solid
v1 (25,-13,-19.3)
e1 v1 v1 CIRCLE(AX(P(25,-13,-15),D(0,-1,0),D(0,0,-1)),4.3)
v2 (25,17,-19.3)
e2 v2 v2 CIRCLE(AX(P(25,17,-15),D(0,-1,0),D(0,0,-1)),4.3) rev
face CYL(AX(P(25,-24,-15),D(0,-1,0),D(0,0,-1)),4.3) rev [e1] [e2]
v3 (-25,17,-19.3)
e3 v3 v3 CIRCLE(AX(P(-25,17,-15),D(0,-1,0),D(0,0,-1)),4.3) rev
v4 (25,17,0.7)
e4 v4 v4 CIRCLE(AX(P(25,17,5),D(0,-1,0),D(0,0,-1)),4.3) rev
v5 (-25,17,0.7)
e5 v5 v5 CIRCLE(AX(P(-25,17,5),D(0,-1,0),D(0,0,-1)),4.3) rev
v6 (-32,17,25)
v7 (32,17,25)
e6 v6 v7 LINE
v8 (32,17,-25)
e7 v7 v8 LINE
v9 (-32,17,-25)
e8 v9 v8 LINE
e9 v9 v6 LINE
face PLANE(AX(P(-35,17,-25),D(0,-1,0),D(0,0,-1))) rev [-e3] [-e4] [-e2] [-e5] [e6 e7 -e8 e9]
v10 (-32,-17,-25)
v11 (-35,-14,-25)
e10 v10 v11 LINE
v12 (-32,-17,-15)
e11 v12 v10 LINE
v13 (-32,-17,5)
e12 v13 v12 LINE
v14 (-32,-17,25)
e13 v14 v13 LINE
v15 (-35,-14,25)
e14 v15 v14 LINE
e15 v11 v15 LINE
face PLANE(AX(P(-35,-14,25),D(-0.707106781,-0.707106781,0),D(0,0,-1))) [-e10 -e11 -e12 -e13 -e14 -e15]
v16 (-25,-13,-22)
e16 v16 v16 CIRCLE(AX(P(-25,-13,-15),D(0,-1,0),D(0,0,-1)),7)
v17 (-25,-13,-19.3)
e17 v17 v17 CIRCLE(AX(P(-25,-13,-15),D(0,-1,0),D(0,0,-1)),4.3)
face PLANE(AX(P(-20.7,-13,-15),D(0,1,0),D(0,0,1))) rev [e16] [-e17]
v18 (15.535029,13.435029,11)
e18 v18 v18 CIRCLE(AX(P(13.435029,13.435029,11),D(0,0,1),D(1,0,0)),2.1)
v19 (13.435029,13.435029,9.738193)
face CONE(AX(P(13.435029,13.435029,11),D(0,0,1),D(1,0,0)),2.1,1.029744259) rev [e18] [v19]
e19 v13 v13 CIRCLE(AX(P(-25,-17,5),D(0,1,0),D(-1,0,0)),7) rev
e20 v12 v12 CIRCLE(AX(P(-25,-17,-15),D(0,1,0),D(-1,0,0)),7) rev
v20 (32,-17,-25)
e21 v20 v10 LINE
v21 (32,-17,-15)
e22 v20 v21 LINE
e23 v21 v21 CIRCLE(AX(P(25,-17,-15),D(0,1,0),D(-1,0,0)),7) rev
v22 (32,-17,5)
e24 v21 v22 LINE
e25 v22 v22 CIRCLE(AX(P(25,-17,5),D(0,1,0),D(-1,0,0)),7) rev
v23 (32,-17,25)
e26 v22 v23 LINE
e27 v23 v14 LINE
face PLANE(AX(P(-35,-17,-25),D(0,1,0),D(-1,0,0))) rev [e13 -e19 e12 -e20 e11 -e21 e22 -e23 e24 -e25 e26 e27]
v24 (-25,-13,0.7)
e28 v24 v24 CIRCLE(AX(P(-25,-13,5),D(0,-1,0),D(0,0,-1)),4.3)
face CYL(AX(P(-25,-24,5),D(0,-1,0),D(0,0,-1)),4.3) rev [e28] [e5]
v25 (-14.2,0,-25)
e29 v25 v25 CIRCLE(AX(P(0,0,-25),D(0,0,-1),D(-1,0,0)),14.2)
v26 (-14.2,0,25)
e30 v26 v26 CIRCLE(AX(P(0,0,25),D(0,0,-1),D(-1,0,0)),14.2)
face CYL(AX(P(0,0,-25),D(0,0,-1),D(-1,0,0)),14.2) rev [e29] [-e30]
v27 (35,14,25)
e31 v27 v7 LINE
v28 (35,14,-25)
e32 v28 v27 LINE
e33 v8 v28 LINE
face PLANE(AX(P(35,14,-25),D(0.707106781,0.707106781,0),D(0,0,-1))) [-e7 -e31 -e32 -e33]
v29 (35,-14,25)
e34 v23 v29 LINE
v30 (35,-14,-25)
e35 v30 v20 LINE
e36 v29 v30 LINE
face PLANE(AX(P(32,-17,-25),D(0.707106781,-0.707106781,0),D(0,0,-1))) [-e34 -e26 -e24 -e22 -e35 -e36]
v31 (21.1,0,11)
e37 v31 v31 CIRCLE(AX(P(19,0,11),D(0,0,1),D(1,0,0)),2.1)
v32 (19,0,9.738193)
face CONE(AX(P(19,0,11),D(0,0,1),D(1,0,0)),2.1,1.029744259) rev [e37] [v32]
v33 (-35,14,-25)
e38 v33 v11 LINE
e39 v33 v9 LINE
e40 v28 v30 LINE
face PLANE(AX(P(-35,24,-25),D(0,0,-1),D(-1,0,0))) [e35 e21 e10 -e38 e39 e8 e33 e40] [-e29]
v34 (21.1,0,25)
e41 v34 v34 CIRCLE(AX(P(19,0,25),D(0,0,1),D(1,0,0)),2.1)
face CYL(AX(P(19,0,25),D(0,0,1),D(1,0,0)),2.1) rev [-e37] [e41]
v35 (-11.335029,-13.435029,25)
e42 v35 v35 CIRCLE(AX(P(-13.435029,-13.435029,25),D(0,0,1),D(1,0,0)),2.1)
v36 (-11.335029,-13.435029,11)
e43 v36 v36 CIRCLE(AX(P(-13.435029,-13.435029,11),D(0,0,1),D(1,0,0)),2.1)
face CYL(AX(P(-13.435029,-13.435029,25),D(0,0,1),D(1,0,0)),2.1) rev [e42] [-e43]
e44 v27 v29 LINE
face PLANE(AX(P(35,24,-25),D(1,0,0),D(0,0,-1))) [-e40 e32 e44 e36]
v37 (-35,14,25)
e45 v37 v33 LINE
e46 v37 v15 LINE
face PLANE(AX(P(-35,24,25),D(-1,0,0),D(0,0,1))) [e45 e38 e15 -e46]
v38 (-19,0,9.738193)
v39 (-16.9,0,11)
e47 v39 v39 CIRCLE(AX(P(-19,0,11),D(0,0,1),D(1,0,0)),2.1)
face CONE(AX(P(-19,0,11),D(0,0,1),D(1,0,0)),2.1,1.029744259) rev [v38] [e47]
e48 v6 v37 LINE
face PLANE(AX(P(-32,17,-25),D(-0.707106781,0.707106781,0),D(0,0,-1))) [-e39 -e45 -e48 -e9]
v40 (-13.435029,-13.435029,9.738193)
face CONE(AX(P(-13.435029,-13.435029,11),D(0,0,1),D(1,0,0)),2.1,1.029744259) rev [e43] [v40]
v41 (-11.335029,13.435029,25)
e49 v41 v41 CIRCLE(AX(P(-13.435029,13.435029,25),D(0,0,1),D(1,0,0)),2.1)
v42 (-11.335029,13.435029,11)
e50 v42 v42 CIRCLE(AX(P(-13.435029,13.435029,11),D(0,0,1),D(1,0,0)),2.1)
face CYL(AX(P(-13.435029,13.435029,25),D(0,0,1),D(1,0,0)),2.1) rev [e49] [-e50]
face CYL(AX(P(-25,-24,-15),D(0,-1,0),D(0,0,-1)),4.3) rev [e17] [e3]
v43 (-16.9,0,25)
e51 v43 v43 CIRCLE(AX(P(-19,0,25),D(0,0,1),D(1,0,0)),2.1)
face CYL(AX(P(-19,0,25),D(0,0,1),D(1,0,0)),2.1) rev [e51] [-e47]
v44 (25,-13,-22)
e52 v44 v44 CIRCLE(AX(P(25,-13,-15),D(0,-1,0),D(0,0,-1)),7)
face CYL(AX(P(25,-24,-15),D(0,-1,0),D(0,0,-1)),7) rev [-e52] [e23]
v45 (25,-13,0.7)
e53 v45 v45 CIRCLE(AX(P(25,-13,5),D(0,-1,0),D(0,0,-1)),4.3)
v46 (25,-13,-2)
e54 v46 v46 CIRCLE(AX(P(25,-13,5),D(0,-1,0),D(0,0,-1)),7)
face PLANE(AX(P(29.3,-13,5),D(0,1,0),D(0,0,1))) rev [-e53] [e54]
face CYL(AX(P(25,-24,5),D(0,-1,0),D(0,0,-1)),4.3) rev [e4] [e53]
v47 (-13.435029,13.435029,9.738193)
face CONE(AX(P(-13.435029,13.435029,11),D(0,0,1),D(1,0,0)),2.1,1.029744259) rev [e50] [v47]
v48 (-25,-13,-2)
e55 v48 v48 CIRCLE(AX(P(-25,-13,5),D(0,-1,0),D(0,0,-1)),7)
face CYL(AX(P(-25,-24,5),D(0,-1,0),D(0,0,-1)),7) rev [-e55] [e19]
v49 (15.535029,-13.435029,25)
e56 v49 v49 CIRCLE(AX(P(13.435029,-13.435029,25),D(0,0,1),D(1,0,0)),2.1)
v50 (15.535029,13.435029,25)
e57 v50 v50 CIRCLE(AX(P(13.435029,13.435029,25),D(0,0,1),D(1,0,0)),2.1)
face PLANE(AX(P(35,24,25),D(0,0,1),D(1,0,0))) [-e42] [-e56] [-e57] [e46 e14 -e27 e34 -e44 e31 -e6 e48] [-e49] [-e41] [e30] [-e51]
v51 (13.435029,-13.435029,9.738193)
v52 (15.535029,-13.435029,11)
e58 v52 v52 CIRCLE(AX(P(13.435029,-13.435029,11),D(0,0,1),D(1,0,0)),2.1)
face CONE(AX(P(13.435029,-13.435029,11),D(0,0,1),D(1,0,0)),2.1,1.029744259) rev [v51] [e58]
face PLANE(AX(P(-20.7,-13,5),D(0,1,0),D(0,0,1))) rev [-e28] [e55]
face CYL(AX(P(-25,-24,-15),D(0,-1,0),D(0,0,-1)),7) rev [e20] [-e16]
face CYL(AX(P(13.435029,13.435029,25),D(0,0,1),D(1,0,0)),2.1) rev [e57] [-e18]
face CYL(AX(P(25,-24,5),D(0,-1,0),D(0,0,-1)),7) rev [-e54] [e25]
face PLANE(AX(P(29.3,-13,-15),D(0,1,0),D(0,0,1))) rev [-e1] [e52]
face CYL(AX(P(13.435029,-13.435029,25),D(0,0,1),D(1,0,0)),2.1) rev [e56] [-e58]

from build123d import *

# Parameters (mm, degrees)
SKETCH1_W                               = 70
SKETCH1_H                               = 50
BOSS_EXTRUDE1_DEPTH                     = 48
CBORE_FOR_M8_HEX_HEAD_BOLT1_D           = 8.6
CBORE_FOR_M8_HEX_HEAD_BOLT1_CBORE_D     = 14
CBORE_FOR_M8_HEX_HEAD_BOLT1_CBORE_DEPTH = 11
M25_CLEARANCE_HOLE1_D                   = 28.4
F_4_2_4_2_DIAMETER_HOLE1_D              = 4.2
F_4_2_4_2_DIAMETER_HOLE1_DEPTH          = 14
F_4_2_4_2_DIAMETER_HOLE1_TIP            = 1.2618073
SKETCH8_W                               = 70
SKETCH8_H                               = 7
CUT_EXTRUDE1_DEPTH                      = 66.582009728
CHAMFER1_SIZE                           = 3


with BuildPart() as part:
    # Sketch1 → Boss-Extrude1 (new body)
    with BuildSketch(Plane.XZ.offset(24)):
        Rectangle(SKETCH1_W, SKETCH1_H)
    extrude(amount=-BOSS_EXTRUDE1_DEPTH)

    # CBORE for M8 Hex Head Bolt1 (through all)
    with Locations(Plane(origin=(0, -24, 0), x_dir=(-1, 0, 0), z_dir=(0, -1, 0))):
        with Locations((25, -5), (-25, -5), (-25, 15), (25, 15)):
            CounterBoreHole(CBORE_FOR_M8_HEX_HEAD_BOLT1_D / 2, CBORE_FOR_M8_HEX_HEAD_BOLT1_CBORE_D / 2, CBORE_FOR_M8_HEX_HEAD_BOLT1_CBORE_DEPTH)

    # M25 Clearance Hole1 (through all)
    with Locations(Plane(origin=(0, 0, -25), x_dir=(-1, 0, 0), z_dir=(0, 0, -1))):
        with Locations((0, 0)):
            Hole(M25_CLEARANCE_HOLE1_D / 2)

    # Ø4.2 (4.2) Diameter Hole1
    with Locations(Plane.XY.offset(25)):
        with Locations((13.435028843, -13.435028843), (13.435028843, 13.435028843), (19, 0), (-13.435028843, 13.435028843), (-13.435028843, -13.435028843), (-19, 0)):
            Hole(F_4_2_4_2_DIAMETER_HOLE1_D / 2, depth=F_4_2_4_2_DIAMETER_HOLE1_DEPTH)
            with Locations((0, 0, -(F_4_2_4_2_DIAMETER_HOLE1_DEPTH + F_4_2_4_2_DIAMETER_HOLE1_TIP / 2))):  # 118° drill point
                Cone(0, F_4_2_4_2_DIAMETER_HOLE1_D / 2, F_4_2_4_2_DIAMETER_HOLE1_TIP, mode=Mode.SUBTRACT)

    # Sketch8 → Cut-Extrude1 (cut, through all)
    with BuildSketch(Plane.XY.offset(25)):
        with Locations((0, 20.5)):
            Rectangle(SKETCH8_W, SKETCH8_H)
        with Locations((0, -20.5)):
            Rectangle(SKETCH8_W, SKETCH8_H)
    extrude(amount=-CUT_EXTRUDE1_DEPTH, mode=Mode.SUBTRACT)

    # Chamfer1
    chamfer1_edges = [part.edges().sort_by_distance(p)[0] for p in [
        (-35, -17, 0),
        (35, -17, 0),
        (35, 17, 0),
        (-35, 17, 0),
    ]]
    chamfer(chamfer1_edges, length=CHAMFER1_SIZE - 0.0001)  # a hair under: the kernel refuses the full size


solid = part.part
